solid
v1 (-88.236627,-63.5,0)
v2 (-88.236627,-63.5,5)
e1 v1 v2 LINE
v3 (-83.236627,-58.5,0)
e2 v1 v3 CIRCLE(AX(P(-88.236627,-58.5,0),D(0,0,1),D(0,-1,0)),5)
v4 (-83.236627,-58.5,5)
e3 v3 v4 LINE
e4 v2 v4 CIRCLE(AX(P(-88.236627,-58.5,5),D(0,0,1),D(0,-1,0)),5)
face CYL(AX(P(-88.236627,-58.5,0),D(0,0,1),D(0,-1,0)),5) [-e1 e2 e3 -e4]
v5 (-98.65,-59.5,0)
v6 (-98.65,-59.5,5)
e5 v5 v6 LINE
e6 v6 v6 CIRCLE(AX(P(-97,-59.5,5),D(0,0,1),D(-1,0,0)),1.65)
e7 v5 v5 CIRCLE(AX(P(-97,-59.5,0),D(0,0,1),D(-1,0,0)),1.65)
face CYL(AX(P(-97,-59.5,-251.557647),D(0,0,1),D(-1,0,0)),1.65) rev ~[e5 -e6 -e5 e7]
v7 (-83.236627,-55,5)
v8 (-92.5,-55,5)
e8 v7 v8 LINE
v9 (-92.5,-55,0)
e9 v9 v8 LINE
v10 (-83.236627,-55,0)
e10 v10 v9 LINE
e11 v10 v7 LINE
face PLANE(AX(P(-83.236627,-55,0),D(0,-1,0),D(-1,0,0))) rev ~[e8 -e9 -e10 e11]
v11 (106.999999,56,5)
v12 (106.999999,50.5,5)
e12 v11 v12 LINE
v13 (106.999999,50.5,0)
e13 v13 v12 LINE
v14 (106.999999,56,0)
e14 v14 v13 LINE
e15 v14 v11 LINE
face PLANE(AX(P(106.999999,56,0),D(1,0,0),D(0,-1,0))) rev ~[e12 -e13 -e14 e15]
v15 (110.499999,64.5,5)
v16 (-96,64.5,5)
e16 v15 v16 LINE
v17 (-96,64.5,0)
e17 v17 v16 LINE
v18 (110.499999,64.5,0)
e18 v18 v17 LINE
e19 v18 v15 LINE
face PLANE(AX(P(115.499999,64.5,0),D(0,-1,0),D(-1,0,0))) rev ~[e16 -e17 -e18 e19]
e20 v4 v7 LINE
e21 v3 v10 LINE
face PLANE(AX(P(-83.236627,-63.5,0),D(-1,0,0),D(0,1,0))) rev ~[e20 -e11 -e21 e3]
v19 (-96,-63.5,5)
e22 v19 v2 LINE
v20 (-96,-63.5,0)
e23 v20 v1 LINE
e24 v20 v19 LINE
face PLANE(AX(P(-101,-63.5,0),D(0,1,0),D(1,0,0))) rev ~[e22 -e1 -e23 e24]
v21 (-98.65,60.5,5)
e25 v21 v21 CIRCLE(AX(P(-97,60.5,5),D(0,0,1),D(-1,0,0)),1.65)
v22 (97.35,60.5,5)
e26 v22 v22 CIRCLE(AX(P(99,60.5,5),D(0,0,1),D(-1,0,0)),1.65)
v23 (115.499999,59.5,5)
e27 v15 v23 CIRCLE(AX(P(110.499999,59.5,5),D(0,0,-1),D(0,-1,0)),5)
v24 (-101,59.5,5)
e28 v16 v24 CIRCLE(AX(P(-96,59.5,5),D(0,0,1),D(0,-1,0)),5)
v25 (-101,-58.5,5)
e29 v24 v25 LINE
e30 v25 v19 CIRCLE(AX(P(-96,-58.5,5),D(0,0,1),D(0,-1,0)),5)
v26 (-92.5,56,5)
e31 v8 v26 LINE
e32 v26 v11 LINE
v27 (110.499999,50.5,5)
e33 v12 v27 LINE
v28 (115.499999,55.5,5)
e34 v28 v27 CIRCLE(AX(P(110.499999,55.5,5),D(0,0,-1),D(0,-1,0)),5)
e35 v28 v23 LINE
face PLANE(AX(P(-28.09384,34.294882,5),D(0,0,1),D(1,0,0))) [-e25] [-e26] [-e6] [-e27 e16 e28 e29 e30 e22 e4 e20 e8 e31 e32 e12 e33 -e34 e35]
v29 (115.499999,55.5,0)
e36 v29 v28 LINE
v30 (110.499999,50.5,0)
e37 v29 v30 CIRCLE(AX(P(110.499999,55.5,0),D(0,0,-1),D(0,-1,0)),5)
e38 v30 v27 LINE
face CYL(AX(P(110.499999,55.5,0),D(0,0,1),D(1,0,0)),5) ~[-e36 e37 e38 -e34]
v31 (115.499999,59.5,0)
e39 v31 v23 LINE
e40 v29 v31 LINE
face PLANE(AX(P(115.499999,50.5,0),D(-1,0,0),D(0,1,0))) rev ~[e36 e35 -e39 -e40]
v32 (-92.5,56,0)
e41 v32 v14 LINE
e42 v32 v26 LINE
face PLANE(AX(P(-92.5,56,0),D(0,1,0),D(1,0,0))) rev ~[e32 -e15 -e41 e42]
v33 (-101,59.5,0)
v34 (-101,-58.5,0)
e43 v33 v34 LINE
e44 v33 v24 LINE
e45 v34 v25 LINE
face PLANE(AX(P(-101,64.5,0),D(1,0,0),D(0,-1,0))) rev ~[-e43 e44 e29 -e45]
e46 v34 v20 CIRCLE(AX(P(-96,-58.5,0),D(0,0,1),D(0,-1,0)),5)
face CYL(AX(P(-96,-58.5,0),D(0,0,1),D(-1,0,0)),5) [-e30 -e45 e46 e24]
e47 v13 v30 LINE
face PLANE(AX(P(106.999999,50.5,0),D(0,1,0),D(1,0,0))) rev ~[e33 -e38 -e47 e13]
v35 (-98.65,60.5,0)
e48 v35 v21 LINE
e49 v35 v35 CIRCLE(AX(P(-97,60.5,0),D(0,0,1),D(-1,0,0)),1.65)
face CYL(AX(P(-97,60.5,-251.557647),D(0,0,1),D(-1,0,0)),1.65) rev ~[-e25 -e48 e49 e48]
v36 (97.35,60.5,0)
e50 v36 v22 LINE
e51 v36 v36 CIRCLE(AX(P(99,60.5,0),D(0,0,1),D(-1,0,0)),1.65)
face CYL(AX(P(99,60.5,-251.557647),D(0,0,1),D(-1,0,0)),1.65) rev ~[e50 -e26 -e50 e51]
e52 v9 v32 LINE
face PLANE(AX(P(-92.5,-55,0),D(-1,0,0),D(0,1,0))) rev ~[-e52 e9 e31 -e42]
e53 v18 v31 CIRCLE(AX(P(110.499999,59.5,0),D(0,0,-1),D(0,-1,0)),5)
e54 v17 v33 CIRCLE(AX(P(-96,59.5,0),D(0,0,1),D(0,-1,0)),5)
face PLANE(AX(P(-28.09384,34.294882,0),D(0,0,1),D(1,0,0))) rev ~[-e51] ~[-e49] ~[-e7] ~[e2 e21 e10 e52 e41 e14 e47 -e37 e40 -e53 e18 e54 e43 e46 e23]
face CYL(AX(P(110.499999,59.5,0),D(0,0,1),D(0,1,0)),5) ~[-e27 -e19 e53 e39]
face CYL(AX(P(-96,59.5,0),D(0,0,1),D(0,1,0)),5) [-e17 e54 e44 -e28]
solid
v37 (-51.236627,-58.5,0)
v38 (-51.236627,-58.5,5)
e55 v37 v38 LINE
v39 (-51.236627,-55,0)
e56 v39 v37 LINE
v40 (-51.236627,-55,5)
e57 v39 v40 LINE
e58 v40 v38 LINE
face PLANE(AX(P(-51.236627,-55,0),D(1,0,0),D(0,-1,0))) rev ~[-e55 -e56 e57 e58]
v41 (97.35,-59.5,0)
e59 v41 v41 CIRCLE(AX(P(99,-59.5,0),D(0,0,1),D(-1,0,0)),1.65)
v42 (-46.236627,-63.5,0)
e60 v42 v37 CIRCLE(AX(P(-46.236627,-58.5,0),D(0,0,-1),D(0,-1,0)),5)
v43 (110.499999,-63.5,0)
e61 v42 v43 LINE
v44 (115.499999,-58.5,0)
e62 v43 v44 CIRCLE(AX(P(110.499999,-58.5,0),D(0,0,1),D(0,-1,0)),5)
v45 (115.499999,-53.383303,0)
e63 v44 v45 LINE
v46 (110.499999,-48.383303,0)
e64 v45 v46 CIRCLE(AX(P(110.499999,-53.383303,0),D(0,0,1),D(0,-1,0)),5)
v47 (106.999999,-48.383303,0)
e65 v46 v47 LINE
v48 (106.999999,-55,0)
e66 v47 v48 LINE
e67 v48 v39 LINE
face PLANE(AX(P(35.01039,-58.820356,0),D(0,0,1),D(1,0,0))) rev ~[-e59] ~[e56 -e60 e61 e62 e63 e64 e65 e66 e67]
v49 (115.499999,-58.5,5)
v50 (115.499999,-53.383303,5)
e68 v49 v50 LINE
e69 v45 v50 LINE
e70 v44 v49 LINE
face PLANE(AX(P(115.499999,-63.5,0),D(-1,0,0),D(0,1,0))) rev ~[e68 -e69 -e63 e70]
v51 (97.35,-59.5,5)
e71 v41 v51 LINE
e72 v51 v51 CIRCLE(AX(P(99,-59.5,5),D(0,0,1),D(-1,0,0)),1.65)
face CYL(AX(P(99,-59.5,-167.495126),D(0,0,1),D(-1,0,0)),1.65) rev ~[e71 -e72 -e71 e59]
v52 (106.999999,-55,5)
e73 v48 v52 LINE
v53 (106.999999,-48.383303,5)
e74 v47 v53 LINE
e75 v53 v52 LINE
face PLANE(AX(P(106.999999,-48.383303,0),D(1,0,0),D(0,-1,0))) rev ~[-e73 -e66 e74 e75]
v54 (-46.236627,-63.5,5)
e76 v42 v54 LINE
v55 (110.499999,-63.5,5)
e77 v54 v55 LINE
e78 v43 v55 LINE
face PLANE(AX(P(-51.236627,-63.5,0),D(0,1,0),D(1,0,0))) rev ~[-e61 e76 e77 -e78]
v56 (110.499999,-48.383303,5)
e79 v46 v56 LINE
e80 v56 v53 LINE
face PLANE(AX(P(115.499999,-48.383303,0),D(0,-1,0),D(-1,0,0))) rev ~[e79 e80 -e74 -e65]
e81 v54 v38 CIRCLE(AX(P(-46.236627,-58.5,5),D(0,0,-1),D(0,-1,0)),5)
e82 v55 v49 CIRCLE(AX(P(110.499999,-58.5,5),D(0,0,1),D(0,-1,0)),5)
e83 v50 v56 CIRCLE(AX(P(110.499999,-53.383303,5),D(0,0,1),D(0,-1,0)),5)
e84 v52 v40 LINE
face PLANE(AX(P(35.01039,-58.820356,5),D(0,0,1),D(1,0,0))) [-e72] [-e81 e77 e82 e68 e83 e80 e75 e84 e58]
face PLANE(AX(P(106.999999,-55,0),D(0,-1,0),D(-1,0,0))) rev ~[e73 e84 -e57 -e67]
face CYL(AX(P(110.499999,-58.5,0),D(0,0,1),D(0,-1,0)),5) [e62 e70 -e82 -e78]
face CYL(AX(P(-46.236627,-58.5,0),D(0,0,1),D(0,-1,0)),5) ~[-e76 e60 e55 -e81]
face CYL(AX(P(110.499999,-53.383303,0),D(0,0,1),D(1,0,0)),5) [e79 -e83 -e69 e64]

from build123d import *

# Parameters (mm, degrees)
F1_DEPTH = 5
F2_D     = 3.3
F2_2_D   = 3.3
F3_R     = 5
F3_2_R   = 5


# Not quite as in the source:
# - two fillets or chamfers of one size are made in one step


with BuildPart() as f1:
    # F0 (on Top) → F1 (new body)
    with BuildSketch(Plane.XY):
        Polygon((115.4999993443, 64.5), (103, 64.5), (-57.083491236, 64.5), (-83.2366272807, 64.5), (-101, 64.5), (-101, -63.5), (-83.2366272807, -63.5), (-83.2366272807, -55), (-92.5, -55), (-92.5, 56), (-83.0929607174, 56), (-57.083491236, 56), (103, 56), (106.9999993443, 56), (106.9999993443, 50.5), (115.4999993443, 50.5), align=None)
    extrude(amount=F1_DEPTH)

    # F2 (through all)
    with Locations(Plane(origin=(0, 0, 0), x_dir=(1, 0, 0), z_dir=(0, 0, -1))):
        with Locations((-97, -60.5), (99, -60.5), (-97, 59.5), (99, 59.5)):
            Hole(F2_D / 2)

    # F3
    f3_edges = [f1.edges().sort_by_distance(p)[0] for p in [
        (-101, 64.5, 2.5),
        (115.499999, 64.5, 2.5),
        (-101, -63.5, 2.5),
        (-83.236627, -63.5, 2.5),
        (115.499999, 50.5, 2.5),
    ]]
    fillet(f3_edges, radius=F3_R)


with BuildPart() as f1b:
    # F0 (on Top) → F1, piece 2 (new body)
    with BuildSketch(Plane.XY):
        Polygon((-51.2366272807, -63.5), (103, -63.5), (115.4999993443, -63.5), (115.4999993443, -48.3833029866), (106.9999993443, -48.3833029866), (106.9999993443, -55), (103, -55), (-51.2366272807, -55), align=None)
    extrude(amount=F1_DEPTH)

    # F2#2 (through all)
    with Locations(Plane(origin=(0, 0, 0), x_dir=(1, 0, 0), z_dir=(0, 0, -1))):
        with Locations((-97, -60.5), (99, -60.5), (-97, 59.5), (99, 59.5)):
            Hole(F2_2_D / 2)

    # F3#2
    f3_2_edges = [f1b.edges().sort_by_distance(p)[0] for p in [
        (-51.236627, -63.5, 2.5),
        (115.499999, -63.5, 2.5),
        (115.499999, -48.383303, 2.5),
    ]]
    fillet(f3_2_edges, radius=F3_2_R)


solid = Compound([f1.part, f1b.part])
